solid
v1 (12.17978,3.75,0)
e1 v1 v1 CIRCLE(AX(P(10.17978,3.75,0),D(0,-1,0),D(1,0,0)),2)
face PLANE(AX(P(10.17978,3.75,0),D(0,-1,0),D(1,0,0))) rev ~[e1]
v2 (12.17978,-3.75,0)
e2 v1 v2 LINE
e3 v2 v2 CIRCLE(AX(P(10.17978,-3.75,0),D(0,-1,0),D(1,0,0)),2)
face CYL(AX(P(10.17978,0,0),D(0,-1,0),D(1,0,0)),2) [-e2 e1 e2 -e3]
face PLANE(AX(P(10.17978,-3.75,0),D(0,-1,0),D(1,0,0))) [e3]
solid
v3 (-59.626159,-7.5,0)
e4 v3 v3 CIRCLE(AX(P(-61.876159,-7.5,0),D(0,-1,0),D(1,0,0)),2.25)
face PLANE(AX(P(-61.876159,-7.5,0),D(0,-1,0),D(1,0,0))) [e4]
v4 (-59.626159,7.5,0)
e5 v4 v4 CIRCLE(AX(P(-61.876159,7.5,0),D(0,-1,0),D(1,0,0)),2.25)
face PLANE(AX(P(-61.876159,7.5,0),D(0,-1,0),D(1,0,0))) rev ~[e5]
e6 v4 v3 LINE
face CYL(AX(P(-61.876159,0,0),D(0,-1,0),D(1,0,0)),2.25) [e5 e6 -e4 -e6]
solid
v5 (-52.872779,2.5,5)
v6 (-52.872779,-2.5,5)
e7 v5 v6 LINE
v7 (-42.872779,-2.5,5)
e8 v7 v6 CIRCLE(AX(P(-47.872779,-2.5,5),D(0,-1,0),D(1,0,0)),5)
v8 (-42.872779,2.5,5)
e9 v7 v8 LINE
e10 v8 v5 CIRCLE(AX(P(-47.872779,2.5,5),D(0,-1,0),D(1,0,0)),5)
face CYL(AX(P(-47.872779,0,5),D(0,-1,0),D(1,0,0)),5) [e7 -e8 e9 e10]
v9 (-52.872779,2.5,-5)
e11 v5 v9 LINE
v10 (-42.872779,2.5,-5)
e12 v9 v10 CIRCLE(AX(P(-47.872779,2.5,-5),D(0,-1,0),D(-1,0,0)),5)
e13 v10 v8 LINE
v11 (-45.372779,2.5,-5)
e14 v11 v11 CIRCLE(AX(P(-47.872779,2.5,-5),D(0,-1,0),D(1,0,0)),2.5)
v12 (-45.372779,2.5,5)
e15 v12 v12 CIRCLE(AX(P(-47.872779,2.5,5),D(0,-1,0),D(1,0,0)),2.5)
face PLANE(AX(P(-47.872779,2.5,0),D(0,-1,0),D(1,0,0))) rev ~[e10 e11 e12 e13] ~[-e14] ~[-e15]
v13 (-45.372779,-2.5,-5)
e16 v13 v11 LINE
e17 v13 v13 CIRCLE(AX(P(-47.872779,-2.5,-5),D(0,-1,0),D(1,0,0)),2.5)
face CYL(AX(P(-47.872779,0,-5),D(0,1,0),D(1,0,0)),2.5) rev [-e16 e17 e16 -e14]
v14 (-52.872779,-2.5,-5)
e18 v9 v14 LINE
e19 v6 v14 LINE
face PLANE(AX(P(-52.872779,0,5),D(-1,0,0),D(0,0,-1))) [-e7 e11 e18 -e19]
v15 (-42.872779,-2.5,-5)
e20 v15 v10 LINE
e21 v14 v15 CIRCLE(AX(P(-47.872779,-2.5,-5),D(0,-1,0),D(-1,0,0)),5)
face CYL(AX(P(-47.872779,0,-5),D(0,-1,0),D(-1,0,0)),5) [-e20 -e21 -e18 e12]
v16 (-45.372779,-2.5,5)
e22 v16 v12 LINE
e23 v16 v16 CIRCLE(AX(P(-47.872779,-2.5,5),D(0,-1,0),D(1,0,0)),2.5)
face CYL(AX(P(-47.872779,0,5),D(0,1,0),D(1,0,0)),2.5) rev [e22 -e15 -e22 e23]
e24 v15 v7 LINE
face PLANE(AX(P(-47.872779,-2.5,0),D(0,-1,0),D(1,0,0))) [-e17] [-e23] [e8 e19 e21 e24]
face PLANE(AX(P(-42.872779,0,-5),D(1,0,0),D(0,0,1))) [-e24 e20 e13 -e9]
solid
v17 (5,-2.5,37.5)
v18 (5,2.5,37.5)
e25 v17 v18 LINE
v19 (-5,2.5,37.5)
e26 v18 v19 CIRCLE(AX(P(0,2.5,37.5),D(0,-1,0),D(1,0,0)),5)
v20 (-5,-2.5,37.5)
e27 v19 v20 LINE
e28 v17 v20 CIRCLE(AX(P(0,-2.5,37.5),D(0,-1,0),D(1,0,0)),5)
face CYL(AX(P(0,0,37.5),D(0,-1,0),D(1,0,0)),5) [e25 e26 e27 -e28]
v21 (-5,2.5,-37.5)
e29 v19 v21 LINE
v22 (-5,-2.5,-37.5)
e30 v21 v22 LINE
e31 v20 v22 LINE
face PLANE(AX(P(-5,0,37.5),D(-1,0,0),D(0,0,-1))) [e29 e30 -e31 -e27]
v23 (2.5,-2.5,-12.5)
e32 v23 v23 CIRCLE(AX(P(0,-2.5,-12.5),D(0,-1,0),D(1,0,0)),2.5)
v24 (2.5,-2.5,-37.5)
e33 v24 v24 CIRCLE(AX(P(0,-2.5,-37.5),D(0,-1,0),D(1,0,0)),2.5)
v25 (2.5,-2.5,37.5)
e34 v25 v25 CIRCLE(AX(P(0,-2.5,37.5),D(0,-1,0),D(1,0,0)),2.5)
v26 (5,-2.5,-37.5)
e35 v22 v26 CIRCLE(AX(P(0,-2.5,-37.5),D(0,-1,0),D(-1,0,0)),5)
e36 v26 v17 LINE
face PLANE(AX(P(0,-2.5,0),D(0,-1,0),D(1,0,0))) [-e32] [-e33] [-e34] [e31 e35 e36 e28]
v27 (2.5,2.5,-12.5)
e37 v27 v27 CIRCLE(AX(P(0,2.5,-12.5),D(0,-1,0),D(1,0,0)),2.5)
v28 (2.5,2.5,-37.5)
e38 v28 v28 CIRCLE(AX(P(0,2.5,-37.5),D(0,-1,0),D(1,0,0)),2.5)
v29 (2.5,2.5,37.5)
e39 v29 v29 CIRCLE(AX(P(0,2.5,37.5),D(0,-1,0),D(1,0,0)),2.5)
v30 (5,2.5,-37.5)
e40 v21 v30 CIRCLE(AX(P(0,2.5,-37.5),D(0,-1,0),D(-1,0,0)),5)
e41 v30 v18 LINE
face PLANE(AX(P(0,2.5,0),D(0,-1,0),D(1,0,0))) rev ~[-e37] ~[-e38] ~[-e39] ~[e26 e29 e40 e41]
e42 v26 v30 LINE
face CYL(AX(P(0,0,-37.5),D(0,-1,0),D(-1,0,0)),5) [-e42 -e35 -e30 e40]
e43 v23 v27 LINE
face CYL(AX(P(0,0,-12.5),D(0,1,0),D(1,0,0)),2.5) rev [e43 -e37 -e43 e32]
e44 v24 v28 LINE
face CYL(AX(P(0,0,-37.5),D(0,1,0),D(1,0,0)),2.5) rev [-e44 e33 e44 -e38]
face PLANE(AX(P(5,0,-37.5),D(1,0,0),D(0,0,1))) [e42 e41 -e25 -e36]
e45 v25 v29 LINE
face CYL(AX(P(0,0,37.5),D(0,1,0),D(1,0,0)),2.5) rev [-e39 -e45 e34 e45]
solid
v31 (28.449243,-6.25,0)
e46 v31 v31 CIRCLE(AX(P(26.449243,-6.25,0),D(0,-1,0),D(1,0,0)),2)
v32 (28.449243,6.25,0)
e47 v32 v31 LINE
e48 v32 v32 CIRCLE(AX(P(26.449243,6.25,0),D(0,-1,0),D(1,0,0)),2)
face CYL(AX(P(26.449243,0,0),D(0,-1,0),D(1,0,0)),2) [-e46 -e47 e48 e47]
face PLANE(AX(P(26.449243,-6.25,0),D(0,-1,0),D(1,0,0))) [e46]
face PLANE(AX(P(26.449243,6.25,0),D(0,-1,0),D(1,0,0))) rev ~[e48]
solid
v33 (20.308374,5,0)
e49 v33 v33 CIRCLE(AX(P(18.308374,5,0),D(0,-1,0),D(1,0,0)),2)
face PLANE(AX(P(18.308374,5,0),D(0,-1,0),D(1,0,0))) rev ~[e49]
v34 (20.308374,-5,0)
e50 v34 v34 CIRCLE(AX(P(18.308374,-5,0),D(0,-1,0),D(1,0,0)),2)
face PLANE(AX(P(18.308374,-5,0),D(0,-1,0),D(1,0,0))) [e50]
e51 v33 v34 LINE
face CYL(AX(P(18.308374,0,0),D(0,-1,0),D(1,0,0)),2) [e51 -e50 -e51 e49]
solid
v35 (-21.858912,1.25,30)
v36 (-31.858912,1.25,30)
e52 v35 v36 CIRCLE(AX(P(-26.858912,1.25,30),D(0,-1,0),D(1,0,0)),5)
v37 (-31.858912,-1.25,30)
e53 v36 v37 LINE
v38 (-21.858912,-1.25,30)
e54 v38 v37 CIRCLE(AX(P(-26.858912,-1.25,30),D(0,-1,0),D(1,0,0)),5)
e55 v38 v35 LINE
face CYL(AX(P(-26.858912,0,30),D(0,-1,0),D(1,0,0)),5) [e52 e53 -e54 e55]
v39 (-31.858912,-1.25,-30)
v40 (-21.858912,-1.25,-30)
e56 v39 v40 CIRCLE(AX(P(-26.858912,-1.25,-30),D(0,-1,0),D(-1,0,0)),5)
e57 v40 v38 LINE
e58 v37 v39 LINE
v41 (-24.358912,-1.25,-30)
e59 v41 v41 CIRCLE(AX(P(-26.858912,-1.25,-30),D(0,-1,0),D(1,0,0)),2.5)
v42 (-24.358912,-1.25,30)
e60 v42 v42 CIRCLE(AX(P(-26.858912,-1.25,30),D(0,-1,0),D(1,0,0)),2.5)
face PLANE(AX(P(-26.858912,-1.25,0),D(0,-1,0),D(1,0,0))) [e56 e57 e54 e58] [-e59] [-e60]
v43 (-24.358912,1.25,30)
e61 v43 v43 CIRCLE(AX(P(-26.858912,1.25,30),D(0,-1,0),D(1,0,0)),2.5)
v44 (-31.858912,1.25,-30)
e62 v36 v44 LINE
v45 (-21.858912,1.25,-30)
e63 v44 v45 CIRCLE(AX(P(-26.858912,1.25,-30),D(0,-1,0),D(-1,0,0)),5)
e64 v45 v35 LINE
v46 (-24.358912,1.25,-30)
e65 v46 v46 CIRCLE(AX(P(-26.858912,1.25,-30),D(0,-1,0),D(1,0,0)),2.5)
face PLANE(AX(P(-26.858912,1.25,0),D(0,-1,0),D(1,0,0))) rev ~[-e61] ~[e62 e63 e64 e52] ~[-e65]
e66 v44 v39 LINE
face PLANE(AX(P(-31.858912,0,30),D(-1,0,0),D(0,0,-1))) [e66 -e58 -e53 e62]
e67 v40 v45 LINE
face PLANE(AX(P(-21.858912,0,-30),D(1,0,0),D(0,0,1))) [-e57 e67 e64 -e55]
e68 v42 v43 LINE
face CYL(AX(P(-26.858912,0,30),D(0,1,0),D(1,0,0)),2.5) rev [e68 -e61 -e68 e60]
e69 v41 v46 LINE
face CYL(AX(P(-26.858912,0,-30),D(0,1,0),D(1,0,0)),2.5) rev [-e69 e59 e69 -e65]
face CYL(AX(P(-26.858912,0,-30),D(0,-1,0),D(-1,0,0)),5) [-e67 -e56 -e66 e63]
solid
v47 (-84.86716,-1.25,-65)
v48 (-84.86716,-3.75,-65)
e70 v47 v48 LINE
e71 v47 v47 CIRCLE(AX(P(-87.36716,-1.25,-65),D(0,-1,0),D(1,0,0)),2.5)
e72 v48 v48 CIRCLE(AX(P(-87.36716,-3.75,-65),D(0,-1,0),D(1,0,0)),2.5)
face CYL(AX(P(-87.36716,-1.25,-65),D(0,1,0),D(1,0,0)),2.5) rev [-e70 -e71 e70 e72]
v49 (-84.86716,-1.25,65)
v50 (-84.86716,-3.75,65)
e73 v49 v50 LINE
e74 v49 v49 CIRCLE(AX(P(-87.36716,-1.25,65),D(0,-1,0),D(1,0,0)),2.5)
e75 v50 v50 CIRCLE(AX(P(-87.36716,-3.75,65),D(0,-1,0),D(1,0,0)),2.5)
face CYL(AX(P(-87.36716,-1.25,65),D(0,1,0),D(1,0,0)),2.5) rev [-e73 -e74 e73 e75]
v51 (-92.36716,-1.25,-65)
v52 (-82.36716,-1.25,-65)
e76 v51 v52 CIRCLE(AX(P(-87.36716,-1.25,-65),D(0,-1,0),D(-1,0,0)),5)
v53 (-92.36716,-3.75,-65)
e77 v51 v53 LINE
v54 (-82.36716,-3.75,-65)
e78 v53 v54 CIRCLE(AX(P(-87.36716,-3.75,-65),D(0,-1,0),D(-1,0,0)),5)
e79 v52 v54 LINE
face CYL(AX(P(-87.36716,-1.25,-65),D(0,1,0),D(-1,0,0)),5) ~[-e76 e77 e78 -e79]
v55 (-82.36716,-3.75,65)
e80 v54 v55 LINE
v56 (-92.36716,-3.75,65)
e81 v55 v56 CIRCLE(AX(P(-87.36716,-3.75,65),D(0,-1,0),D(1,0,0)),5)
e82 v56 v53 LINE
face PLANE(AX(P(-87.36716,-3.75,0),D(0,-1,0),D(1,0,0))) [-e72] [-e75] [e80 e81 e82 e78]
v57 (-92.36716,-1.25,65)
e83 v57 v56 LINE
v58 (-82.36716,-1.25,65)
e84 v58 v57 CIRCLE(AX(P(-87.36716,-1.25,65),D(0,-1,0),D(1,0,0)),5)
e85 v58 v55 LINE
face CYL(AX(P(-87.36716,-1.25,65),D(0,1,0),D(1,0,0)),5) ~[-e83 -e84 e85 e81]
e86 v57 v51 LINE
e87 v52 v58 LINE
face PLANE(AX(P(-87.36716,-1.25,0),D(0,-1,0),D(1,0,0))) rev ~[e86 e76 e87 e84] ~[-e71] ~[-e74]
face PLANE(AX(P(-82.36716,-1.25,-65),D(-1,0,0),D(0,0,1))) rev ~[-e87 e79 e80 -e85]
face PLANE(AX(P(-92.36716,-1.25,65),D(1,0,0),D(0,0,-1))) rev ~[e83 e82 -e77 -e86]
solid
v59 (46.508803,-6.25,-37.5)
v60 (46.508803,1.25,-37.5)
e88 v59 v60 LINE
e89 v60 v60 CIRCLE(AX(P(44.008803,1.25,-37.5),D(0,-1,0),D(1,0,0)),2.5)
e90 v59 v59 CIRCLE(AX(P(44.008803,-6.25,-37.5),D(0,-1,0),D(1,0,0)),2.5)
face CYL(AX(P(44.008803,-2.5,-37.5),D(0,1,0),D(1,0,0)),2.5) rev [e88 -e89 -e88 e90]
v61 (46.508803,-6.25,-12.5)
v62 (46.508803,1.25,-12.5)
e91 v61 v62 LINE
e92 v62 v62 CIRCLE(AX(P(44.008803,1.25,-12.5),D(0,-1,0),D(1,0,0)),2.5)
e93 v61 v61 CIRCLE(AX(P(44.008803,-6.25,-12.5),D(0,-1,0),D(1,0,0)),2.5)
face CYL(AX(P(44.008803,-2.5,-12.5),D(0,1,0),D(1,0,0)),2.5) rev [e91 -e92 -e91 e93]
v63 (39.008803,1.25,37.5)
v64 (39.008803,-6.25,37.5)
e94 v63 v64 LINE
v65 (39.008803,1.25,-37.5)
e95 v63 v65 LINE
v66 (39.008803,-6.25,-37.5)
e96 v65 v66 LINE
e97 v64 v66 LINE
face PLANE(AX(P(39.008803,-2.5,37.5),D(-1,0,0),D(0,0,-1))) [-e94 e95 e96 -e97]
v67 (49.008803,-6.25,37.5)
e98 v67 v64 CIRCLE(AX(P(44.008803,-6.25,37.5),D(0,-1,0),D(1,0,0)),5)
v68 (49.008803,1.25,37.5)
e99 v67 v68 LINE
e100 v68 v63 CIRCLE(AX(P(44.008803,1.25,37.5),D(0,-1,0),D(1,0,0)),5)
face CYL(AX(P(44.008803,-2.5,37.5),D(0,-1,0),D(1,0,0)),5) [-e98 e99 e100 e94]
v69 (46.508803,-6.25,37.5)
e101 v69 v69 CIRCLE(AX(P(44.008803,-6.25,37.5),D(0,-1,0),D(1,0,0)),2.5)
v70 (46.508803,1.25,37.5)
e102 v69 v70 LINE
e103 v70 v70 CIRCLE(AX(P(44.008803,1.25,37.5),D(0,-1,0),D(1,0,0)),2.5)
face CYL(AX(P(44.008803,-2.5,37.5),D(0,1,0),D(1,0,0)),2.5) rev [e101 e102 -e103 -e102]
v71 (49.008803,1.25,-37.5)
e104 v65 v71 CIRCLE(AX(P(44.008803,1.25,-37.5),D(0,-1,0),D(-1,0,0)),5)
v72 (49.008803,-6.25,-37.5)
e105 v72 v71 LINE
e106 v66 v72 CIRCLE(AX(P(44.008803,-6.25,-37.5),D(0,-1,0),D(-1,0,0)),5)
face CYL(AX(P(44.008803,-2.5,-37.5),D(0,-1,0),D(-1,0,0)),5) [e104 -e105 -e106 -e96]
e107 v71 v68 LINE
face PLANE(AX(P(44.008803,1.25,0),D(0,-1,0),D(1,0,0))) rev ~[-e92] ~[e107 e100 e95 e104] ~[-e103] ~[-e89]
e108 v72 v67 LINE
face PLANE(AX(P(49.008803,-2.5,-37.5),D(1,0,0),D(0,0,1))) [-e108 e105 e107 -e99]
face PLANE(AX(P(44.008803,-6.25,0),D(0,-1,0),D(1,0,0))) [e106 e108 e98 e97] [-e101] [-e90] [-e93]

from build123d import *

# Parameters (mm, degrees)
F2_R      = 2.5
F3_DEPTH  = 2.5
F4_R      = 2.5
F5_DEPTH  = 1.25
F6_R      = 2.5
F7_DEPTH  = 2.5
F8_R      = 2
F9_DEPTH  = 3.75
F10_R     = 2
F11_DEPTH = 5
F12_R     = 2.5
F13_DEPTH = 3.75
F14_R     = 2
F15_DEPTH = 6.25
F16_R     = 2.25
F17_DEPTH = 7.5
F18_R     = 2.5
F19_DEPTH = 2.5


with BuildPart() as f3:
    # F2 (on Front) → F3 (new body, symmetric)
    with BuildSketch(Plane.XZ):
        with BuildLine():
            Line((5, 0), (5, 37.5))
            ThreePointArc((5, 37.5), (0, 42.5), (-5, 37.5))
            Line((-5, 37.5), (-5, 0))
            Line((-5, 0), (-5, -37.5))
            ThreePointArc((-5, -37.5), (0, -42.5), (5, -37.5))
            Line((5, -37.5), (5, 0))
        make_face()
        with Locations((0, -37.5)):
            Circle(F2_R, mode=Mode.SUBTRACT)
        with Locations((0, -12.5)):
            Circle(F2_R, mode=Mode.SUBTRACT)
        with Locations((0, 37.5)):
            Circle(F2_R, mode=Mode.SUBTRACT)
    extrude(amount=F3_DEPTH, both=True)


with BuildPart() as f5:
    # F4 (on Front) → F5 (new body, symmetric)
    with BuildSketch(Plane.XZ):
        with BuildLine():
            Line((-21.8589119613, 0), (-21.8589119613, 30))
            ThreePointArc((-21.8589119613, 30), (-26.8589119613, 35), (-31.8589119613, 30))
            Line((-31.8589119613, 30), (-31.8589119613, 0))
            Line((-31.8589119613, 0), (-31.8589119613, -30))
            ThreePointArc((-31.8589119613, -30), (-26.8589119613, -35), (-21.8589119613, -30))
            Line((-21.8589119613, -30), (-21.8589119613, 0))
        make_face()
        with Locations((-26.8589119613, -30)):
            Circle(F4_R, mode=Mode.SUBTRACT)
        with Locations((-26.8589119613, 30)):
            Circle(F4_R, mode=Mode.SUBTRACT)
    extrude(amount=F5_DEPTH, both=True)


with BuildPart() as f7:
    # F6 (on Front) → F7 (new body, symmetric)
    with BuildSketch(Plane.XZ):
        with BuildLine():
            Line((-42.8727790713, 0), (-42.8727790713, 5))
            ThreePointArc((-42.8727790713, 5), (-47.8727790713, 10), (-52.8727790713, 5))
            Line((-52.8727790713, 5), (-52.8727790713, 0))
            Line((-52.8727790713, 0), (-52.8727790713, -5))
            ThreePointArc((-52.8727790713, -5), (-47.8727790713, -10), (-42.8727790713, -5))
            Line((-42.8727790713, -5), (-42.8727790713, 0))
        make_face()
        with Locations((-47.8727790713, -5)):
            Circle(F6_R, mode=Mode.SUBTRACT)
        with Locations((-47.8727790713, 5)):
            Circle(F6_R, mode=Mode.SUBTRACT)
    extrude(amount=F7_DEPTH, both=True)


with BuildPart() as f9:
    # F8 (on Front) → F9 (new body, symmetric)
    with BuildSketch(Plane.XZ):
        with Locations((10.1797801788, 0)):
            Circle(F8_R)
    extrude(amount=F9_DEPTH, both=True)


with BuildPart() as f11:
    # F10 (on Front) → F11 (new body, symmetric)
    with BuildSketch(Plane.XZ):
        with Locations((18.3083742857, 0)):
            Circle(F10_R)
    extrude(amount=F11_DEPTH, both=True)


with BuildPart() as f13:
    # F12 (on face) → F13 (new body, symmetric)
    with BuildSketch(Plane.XZ.offset(2.5)):
        with BuildLine():
            Line((49.0088026483, 0), (49.0088026483, 37.5))
            ThreePointArc((49.0088026483, 37.5), (44.0088026483, 42.5), (39.0088026483, 37.5))
            Line((39.0088026483, 37.5), (39.0088026483, 0))
            Line((39.0088026483, 0), (39.0088026483, -37.5))
            ThreePointArc((39.0088026483, -37.5), (44.0088026483, -42.5), (49.0088026483, -37.5))
            Line((49.0088026483, -37.5), (49.0088026483, 0))
        make_face()
        with Locations((44.0088026483, -37.5)):
            Circle(F12_R, mode=Mode.SUBTRACT)
        with Locations((44.0088026483, -12.5)):
            Circle(F12_R, mode=Mode.SUBTRACT)
        with Locations((44.0088026483, 37.5)):
            Circle(F12_R, mode=Mode.SUBTRACT)
    extrude(amount=F13_DEPTH, both=True)


with BuildPart() as f15:
    # F14 (on Front) → F15 (new body, symmetric)
    with BuildSketch(Plane.XZ):
        with Locations((26.4492426068, 0)):
            Circle(F14_R)
    extrude(amount=F15_DEPTH, both=True)


with BuildPart() as f17:
    # F16 (on Front) → F17 (new body, symmetric)
    with BuildSketch(Plane.XZ):
        with Locations((-61.8761591613, 0)):
            Circle(F16_R)
    extrude(amount=F17_DEPTH, both=True)


with BuildPart() as f19:
    # F18 (on face) → F19 (new body)
    with BuildSketch(Plane.XZ.offset(1.25)):
        with BuildLine():
            Line((-82.3671596532, 0), (-82.3671596532, 65))
            ThreePointArc((-82.3671596532, 65), (-87.3671596532, 70), (-92.3671596532, 65))
            Line((-92.3671596532, 65), (-92.3671596532, 0))
            Line((-92.3671596532, 0), (-92.3671596532, -65))
            ThreePointArc((-92.3671596532, -65), (-87.3671596532, -70), (-82.3671596532, -65))
            Line((-82.3671596532, -65), (-82.3671596532, 0))
        make_face()
        with Locations((-87.3671596532, -65)):
            Circle(F18_R, mode=Mode.SUBTRACT)
        with Locations((-87.3671596532, 65)):
            Circle(F18_R, mode=Mode.SUBTRACT)
    extrude(amount=F19_DEPTH)


solid = Compound([f3.part, f5.part, f7.part, f9.part, f11.part, f13.part, f15.part, f17.part, f19.part])
